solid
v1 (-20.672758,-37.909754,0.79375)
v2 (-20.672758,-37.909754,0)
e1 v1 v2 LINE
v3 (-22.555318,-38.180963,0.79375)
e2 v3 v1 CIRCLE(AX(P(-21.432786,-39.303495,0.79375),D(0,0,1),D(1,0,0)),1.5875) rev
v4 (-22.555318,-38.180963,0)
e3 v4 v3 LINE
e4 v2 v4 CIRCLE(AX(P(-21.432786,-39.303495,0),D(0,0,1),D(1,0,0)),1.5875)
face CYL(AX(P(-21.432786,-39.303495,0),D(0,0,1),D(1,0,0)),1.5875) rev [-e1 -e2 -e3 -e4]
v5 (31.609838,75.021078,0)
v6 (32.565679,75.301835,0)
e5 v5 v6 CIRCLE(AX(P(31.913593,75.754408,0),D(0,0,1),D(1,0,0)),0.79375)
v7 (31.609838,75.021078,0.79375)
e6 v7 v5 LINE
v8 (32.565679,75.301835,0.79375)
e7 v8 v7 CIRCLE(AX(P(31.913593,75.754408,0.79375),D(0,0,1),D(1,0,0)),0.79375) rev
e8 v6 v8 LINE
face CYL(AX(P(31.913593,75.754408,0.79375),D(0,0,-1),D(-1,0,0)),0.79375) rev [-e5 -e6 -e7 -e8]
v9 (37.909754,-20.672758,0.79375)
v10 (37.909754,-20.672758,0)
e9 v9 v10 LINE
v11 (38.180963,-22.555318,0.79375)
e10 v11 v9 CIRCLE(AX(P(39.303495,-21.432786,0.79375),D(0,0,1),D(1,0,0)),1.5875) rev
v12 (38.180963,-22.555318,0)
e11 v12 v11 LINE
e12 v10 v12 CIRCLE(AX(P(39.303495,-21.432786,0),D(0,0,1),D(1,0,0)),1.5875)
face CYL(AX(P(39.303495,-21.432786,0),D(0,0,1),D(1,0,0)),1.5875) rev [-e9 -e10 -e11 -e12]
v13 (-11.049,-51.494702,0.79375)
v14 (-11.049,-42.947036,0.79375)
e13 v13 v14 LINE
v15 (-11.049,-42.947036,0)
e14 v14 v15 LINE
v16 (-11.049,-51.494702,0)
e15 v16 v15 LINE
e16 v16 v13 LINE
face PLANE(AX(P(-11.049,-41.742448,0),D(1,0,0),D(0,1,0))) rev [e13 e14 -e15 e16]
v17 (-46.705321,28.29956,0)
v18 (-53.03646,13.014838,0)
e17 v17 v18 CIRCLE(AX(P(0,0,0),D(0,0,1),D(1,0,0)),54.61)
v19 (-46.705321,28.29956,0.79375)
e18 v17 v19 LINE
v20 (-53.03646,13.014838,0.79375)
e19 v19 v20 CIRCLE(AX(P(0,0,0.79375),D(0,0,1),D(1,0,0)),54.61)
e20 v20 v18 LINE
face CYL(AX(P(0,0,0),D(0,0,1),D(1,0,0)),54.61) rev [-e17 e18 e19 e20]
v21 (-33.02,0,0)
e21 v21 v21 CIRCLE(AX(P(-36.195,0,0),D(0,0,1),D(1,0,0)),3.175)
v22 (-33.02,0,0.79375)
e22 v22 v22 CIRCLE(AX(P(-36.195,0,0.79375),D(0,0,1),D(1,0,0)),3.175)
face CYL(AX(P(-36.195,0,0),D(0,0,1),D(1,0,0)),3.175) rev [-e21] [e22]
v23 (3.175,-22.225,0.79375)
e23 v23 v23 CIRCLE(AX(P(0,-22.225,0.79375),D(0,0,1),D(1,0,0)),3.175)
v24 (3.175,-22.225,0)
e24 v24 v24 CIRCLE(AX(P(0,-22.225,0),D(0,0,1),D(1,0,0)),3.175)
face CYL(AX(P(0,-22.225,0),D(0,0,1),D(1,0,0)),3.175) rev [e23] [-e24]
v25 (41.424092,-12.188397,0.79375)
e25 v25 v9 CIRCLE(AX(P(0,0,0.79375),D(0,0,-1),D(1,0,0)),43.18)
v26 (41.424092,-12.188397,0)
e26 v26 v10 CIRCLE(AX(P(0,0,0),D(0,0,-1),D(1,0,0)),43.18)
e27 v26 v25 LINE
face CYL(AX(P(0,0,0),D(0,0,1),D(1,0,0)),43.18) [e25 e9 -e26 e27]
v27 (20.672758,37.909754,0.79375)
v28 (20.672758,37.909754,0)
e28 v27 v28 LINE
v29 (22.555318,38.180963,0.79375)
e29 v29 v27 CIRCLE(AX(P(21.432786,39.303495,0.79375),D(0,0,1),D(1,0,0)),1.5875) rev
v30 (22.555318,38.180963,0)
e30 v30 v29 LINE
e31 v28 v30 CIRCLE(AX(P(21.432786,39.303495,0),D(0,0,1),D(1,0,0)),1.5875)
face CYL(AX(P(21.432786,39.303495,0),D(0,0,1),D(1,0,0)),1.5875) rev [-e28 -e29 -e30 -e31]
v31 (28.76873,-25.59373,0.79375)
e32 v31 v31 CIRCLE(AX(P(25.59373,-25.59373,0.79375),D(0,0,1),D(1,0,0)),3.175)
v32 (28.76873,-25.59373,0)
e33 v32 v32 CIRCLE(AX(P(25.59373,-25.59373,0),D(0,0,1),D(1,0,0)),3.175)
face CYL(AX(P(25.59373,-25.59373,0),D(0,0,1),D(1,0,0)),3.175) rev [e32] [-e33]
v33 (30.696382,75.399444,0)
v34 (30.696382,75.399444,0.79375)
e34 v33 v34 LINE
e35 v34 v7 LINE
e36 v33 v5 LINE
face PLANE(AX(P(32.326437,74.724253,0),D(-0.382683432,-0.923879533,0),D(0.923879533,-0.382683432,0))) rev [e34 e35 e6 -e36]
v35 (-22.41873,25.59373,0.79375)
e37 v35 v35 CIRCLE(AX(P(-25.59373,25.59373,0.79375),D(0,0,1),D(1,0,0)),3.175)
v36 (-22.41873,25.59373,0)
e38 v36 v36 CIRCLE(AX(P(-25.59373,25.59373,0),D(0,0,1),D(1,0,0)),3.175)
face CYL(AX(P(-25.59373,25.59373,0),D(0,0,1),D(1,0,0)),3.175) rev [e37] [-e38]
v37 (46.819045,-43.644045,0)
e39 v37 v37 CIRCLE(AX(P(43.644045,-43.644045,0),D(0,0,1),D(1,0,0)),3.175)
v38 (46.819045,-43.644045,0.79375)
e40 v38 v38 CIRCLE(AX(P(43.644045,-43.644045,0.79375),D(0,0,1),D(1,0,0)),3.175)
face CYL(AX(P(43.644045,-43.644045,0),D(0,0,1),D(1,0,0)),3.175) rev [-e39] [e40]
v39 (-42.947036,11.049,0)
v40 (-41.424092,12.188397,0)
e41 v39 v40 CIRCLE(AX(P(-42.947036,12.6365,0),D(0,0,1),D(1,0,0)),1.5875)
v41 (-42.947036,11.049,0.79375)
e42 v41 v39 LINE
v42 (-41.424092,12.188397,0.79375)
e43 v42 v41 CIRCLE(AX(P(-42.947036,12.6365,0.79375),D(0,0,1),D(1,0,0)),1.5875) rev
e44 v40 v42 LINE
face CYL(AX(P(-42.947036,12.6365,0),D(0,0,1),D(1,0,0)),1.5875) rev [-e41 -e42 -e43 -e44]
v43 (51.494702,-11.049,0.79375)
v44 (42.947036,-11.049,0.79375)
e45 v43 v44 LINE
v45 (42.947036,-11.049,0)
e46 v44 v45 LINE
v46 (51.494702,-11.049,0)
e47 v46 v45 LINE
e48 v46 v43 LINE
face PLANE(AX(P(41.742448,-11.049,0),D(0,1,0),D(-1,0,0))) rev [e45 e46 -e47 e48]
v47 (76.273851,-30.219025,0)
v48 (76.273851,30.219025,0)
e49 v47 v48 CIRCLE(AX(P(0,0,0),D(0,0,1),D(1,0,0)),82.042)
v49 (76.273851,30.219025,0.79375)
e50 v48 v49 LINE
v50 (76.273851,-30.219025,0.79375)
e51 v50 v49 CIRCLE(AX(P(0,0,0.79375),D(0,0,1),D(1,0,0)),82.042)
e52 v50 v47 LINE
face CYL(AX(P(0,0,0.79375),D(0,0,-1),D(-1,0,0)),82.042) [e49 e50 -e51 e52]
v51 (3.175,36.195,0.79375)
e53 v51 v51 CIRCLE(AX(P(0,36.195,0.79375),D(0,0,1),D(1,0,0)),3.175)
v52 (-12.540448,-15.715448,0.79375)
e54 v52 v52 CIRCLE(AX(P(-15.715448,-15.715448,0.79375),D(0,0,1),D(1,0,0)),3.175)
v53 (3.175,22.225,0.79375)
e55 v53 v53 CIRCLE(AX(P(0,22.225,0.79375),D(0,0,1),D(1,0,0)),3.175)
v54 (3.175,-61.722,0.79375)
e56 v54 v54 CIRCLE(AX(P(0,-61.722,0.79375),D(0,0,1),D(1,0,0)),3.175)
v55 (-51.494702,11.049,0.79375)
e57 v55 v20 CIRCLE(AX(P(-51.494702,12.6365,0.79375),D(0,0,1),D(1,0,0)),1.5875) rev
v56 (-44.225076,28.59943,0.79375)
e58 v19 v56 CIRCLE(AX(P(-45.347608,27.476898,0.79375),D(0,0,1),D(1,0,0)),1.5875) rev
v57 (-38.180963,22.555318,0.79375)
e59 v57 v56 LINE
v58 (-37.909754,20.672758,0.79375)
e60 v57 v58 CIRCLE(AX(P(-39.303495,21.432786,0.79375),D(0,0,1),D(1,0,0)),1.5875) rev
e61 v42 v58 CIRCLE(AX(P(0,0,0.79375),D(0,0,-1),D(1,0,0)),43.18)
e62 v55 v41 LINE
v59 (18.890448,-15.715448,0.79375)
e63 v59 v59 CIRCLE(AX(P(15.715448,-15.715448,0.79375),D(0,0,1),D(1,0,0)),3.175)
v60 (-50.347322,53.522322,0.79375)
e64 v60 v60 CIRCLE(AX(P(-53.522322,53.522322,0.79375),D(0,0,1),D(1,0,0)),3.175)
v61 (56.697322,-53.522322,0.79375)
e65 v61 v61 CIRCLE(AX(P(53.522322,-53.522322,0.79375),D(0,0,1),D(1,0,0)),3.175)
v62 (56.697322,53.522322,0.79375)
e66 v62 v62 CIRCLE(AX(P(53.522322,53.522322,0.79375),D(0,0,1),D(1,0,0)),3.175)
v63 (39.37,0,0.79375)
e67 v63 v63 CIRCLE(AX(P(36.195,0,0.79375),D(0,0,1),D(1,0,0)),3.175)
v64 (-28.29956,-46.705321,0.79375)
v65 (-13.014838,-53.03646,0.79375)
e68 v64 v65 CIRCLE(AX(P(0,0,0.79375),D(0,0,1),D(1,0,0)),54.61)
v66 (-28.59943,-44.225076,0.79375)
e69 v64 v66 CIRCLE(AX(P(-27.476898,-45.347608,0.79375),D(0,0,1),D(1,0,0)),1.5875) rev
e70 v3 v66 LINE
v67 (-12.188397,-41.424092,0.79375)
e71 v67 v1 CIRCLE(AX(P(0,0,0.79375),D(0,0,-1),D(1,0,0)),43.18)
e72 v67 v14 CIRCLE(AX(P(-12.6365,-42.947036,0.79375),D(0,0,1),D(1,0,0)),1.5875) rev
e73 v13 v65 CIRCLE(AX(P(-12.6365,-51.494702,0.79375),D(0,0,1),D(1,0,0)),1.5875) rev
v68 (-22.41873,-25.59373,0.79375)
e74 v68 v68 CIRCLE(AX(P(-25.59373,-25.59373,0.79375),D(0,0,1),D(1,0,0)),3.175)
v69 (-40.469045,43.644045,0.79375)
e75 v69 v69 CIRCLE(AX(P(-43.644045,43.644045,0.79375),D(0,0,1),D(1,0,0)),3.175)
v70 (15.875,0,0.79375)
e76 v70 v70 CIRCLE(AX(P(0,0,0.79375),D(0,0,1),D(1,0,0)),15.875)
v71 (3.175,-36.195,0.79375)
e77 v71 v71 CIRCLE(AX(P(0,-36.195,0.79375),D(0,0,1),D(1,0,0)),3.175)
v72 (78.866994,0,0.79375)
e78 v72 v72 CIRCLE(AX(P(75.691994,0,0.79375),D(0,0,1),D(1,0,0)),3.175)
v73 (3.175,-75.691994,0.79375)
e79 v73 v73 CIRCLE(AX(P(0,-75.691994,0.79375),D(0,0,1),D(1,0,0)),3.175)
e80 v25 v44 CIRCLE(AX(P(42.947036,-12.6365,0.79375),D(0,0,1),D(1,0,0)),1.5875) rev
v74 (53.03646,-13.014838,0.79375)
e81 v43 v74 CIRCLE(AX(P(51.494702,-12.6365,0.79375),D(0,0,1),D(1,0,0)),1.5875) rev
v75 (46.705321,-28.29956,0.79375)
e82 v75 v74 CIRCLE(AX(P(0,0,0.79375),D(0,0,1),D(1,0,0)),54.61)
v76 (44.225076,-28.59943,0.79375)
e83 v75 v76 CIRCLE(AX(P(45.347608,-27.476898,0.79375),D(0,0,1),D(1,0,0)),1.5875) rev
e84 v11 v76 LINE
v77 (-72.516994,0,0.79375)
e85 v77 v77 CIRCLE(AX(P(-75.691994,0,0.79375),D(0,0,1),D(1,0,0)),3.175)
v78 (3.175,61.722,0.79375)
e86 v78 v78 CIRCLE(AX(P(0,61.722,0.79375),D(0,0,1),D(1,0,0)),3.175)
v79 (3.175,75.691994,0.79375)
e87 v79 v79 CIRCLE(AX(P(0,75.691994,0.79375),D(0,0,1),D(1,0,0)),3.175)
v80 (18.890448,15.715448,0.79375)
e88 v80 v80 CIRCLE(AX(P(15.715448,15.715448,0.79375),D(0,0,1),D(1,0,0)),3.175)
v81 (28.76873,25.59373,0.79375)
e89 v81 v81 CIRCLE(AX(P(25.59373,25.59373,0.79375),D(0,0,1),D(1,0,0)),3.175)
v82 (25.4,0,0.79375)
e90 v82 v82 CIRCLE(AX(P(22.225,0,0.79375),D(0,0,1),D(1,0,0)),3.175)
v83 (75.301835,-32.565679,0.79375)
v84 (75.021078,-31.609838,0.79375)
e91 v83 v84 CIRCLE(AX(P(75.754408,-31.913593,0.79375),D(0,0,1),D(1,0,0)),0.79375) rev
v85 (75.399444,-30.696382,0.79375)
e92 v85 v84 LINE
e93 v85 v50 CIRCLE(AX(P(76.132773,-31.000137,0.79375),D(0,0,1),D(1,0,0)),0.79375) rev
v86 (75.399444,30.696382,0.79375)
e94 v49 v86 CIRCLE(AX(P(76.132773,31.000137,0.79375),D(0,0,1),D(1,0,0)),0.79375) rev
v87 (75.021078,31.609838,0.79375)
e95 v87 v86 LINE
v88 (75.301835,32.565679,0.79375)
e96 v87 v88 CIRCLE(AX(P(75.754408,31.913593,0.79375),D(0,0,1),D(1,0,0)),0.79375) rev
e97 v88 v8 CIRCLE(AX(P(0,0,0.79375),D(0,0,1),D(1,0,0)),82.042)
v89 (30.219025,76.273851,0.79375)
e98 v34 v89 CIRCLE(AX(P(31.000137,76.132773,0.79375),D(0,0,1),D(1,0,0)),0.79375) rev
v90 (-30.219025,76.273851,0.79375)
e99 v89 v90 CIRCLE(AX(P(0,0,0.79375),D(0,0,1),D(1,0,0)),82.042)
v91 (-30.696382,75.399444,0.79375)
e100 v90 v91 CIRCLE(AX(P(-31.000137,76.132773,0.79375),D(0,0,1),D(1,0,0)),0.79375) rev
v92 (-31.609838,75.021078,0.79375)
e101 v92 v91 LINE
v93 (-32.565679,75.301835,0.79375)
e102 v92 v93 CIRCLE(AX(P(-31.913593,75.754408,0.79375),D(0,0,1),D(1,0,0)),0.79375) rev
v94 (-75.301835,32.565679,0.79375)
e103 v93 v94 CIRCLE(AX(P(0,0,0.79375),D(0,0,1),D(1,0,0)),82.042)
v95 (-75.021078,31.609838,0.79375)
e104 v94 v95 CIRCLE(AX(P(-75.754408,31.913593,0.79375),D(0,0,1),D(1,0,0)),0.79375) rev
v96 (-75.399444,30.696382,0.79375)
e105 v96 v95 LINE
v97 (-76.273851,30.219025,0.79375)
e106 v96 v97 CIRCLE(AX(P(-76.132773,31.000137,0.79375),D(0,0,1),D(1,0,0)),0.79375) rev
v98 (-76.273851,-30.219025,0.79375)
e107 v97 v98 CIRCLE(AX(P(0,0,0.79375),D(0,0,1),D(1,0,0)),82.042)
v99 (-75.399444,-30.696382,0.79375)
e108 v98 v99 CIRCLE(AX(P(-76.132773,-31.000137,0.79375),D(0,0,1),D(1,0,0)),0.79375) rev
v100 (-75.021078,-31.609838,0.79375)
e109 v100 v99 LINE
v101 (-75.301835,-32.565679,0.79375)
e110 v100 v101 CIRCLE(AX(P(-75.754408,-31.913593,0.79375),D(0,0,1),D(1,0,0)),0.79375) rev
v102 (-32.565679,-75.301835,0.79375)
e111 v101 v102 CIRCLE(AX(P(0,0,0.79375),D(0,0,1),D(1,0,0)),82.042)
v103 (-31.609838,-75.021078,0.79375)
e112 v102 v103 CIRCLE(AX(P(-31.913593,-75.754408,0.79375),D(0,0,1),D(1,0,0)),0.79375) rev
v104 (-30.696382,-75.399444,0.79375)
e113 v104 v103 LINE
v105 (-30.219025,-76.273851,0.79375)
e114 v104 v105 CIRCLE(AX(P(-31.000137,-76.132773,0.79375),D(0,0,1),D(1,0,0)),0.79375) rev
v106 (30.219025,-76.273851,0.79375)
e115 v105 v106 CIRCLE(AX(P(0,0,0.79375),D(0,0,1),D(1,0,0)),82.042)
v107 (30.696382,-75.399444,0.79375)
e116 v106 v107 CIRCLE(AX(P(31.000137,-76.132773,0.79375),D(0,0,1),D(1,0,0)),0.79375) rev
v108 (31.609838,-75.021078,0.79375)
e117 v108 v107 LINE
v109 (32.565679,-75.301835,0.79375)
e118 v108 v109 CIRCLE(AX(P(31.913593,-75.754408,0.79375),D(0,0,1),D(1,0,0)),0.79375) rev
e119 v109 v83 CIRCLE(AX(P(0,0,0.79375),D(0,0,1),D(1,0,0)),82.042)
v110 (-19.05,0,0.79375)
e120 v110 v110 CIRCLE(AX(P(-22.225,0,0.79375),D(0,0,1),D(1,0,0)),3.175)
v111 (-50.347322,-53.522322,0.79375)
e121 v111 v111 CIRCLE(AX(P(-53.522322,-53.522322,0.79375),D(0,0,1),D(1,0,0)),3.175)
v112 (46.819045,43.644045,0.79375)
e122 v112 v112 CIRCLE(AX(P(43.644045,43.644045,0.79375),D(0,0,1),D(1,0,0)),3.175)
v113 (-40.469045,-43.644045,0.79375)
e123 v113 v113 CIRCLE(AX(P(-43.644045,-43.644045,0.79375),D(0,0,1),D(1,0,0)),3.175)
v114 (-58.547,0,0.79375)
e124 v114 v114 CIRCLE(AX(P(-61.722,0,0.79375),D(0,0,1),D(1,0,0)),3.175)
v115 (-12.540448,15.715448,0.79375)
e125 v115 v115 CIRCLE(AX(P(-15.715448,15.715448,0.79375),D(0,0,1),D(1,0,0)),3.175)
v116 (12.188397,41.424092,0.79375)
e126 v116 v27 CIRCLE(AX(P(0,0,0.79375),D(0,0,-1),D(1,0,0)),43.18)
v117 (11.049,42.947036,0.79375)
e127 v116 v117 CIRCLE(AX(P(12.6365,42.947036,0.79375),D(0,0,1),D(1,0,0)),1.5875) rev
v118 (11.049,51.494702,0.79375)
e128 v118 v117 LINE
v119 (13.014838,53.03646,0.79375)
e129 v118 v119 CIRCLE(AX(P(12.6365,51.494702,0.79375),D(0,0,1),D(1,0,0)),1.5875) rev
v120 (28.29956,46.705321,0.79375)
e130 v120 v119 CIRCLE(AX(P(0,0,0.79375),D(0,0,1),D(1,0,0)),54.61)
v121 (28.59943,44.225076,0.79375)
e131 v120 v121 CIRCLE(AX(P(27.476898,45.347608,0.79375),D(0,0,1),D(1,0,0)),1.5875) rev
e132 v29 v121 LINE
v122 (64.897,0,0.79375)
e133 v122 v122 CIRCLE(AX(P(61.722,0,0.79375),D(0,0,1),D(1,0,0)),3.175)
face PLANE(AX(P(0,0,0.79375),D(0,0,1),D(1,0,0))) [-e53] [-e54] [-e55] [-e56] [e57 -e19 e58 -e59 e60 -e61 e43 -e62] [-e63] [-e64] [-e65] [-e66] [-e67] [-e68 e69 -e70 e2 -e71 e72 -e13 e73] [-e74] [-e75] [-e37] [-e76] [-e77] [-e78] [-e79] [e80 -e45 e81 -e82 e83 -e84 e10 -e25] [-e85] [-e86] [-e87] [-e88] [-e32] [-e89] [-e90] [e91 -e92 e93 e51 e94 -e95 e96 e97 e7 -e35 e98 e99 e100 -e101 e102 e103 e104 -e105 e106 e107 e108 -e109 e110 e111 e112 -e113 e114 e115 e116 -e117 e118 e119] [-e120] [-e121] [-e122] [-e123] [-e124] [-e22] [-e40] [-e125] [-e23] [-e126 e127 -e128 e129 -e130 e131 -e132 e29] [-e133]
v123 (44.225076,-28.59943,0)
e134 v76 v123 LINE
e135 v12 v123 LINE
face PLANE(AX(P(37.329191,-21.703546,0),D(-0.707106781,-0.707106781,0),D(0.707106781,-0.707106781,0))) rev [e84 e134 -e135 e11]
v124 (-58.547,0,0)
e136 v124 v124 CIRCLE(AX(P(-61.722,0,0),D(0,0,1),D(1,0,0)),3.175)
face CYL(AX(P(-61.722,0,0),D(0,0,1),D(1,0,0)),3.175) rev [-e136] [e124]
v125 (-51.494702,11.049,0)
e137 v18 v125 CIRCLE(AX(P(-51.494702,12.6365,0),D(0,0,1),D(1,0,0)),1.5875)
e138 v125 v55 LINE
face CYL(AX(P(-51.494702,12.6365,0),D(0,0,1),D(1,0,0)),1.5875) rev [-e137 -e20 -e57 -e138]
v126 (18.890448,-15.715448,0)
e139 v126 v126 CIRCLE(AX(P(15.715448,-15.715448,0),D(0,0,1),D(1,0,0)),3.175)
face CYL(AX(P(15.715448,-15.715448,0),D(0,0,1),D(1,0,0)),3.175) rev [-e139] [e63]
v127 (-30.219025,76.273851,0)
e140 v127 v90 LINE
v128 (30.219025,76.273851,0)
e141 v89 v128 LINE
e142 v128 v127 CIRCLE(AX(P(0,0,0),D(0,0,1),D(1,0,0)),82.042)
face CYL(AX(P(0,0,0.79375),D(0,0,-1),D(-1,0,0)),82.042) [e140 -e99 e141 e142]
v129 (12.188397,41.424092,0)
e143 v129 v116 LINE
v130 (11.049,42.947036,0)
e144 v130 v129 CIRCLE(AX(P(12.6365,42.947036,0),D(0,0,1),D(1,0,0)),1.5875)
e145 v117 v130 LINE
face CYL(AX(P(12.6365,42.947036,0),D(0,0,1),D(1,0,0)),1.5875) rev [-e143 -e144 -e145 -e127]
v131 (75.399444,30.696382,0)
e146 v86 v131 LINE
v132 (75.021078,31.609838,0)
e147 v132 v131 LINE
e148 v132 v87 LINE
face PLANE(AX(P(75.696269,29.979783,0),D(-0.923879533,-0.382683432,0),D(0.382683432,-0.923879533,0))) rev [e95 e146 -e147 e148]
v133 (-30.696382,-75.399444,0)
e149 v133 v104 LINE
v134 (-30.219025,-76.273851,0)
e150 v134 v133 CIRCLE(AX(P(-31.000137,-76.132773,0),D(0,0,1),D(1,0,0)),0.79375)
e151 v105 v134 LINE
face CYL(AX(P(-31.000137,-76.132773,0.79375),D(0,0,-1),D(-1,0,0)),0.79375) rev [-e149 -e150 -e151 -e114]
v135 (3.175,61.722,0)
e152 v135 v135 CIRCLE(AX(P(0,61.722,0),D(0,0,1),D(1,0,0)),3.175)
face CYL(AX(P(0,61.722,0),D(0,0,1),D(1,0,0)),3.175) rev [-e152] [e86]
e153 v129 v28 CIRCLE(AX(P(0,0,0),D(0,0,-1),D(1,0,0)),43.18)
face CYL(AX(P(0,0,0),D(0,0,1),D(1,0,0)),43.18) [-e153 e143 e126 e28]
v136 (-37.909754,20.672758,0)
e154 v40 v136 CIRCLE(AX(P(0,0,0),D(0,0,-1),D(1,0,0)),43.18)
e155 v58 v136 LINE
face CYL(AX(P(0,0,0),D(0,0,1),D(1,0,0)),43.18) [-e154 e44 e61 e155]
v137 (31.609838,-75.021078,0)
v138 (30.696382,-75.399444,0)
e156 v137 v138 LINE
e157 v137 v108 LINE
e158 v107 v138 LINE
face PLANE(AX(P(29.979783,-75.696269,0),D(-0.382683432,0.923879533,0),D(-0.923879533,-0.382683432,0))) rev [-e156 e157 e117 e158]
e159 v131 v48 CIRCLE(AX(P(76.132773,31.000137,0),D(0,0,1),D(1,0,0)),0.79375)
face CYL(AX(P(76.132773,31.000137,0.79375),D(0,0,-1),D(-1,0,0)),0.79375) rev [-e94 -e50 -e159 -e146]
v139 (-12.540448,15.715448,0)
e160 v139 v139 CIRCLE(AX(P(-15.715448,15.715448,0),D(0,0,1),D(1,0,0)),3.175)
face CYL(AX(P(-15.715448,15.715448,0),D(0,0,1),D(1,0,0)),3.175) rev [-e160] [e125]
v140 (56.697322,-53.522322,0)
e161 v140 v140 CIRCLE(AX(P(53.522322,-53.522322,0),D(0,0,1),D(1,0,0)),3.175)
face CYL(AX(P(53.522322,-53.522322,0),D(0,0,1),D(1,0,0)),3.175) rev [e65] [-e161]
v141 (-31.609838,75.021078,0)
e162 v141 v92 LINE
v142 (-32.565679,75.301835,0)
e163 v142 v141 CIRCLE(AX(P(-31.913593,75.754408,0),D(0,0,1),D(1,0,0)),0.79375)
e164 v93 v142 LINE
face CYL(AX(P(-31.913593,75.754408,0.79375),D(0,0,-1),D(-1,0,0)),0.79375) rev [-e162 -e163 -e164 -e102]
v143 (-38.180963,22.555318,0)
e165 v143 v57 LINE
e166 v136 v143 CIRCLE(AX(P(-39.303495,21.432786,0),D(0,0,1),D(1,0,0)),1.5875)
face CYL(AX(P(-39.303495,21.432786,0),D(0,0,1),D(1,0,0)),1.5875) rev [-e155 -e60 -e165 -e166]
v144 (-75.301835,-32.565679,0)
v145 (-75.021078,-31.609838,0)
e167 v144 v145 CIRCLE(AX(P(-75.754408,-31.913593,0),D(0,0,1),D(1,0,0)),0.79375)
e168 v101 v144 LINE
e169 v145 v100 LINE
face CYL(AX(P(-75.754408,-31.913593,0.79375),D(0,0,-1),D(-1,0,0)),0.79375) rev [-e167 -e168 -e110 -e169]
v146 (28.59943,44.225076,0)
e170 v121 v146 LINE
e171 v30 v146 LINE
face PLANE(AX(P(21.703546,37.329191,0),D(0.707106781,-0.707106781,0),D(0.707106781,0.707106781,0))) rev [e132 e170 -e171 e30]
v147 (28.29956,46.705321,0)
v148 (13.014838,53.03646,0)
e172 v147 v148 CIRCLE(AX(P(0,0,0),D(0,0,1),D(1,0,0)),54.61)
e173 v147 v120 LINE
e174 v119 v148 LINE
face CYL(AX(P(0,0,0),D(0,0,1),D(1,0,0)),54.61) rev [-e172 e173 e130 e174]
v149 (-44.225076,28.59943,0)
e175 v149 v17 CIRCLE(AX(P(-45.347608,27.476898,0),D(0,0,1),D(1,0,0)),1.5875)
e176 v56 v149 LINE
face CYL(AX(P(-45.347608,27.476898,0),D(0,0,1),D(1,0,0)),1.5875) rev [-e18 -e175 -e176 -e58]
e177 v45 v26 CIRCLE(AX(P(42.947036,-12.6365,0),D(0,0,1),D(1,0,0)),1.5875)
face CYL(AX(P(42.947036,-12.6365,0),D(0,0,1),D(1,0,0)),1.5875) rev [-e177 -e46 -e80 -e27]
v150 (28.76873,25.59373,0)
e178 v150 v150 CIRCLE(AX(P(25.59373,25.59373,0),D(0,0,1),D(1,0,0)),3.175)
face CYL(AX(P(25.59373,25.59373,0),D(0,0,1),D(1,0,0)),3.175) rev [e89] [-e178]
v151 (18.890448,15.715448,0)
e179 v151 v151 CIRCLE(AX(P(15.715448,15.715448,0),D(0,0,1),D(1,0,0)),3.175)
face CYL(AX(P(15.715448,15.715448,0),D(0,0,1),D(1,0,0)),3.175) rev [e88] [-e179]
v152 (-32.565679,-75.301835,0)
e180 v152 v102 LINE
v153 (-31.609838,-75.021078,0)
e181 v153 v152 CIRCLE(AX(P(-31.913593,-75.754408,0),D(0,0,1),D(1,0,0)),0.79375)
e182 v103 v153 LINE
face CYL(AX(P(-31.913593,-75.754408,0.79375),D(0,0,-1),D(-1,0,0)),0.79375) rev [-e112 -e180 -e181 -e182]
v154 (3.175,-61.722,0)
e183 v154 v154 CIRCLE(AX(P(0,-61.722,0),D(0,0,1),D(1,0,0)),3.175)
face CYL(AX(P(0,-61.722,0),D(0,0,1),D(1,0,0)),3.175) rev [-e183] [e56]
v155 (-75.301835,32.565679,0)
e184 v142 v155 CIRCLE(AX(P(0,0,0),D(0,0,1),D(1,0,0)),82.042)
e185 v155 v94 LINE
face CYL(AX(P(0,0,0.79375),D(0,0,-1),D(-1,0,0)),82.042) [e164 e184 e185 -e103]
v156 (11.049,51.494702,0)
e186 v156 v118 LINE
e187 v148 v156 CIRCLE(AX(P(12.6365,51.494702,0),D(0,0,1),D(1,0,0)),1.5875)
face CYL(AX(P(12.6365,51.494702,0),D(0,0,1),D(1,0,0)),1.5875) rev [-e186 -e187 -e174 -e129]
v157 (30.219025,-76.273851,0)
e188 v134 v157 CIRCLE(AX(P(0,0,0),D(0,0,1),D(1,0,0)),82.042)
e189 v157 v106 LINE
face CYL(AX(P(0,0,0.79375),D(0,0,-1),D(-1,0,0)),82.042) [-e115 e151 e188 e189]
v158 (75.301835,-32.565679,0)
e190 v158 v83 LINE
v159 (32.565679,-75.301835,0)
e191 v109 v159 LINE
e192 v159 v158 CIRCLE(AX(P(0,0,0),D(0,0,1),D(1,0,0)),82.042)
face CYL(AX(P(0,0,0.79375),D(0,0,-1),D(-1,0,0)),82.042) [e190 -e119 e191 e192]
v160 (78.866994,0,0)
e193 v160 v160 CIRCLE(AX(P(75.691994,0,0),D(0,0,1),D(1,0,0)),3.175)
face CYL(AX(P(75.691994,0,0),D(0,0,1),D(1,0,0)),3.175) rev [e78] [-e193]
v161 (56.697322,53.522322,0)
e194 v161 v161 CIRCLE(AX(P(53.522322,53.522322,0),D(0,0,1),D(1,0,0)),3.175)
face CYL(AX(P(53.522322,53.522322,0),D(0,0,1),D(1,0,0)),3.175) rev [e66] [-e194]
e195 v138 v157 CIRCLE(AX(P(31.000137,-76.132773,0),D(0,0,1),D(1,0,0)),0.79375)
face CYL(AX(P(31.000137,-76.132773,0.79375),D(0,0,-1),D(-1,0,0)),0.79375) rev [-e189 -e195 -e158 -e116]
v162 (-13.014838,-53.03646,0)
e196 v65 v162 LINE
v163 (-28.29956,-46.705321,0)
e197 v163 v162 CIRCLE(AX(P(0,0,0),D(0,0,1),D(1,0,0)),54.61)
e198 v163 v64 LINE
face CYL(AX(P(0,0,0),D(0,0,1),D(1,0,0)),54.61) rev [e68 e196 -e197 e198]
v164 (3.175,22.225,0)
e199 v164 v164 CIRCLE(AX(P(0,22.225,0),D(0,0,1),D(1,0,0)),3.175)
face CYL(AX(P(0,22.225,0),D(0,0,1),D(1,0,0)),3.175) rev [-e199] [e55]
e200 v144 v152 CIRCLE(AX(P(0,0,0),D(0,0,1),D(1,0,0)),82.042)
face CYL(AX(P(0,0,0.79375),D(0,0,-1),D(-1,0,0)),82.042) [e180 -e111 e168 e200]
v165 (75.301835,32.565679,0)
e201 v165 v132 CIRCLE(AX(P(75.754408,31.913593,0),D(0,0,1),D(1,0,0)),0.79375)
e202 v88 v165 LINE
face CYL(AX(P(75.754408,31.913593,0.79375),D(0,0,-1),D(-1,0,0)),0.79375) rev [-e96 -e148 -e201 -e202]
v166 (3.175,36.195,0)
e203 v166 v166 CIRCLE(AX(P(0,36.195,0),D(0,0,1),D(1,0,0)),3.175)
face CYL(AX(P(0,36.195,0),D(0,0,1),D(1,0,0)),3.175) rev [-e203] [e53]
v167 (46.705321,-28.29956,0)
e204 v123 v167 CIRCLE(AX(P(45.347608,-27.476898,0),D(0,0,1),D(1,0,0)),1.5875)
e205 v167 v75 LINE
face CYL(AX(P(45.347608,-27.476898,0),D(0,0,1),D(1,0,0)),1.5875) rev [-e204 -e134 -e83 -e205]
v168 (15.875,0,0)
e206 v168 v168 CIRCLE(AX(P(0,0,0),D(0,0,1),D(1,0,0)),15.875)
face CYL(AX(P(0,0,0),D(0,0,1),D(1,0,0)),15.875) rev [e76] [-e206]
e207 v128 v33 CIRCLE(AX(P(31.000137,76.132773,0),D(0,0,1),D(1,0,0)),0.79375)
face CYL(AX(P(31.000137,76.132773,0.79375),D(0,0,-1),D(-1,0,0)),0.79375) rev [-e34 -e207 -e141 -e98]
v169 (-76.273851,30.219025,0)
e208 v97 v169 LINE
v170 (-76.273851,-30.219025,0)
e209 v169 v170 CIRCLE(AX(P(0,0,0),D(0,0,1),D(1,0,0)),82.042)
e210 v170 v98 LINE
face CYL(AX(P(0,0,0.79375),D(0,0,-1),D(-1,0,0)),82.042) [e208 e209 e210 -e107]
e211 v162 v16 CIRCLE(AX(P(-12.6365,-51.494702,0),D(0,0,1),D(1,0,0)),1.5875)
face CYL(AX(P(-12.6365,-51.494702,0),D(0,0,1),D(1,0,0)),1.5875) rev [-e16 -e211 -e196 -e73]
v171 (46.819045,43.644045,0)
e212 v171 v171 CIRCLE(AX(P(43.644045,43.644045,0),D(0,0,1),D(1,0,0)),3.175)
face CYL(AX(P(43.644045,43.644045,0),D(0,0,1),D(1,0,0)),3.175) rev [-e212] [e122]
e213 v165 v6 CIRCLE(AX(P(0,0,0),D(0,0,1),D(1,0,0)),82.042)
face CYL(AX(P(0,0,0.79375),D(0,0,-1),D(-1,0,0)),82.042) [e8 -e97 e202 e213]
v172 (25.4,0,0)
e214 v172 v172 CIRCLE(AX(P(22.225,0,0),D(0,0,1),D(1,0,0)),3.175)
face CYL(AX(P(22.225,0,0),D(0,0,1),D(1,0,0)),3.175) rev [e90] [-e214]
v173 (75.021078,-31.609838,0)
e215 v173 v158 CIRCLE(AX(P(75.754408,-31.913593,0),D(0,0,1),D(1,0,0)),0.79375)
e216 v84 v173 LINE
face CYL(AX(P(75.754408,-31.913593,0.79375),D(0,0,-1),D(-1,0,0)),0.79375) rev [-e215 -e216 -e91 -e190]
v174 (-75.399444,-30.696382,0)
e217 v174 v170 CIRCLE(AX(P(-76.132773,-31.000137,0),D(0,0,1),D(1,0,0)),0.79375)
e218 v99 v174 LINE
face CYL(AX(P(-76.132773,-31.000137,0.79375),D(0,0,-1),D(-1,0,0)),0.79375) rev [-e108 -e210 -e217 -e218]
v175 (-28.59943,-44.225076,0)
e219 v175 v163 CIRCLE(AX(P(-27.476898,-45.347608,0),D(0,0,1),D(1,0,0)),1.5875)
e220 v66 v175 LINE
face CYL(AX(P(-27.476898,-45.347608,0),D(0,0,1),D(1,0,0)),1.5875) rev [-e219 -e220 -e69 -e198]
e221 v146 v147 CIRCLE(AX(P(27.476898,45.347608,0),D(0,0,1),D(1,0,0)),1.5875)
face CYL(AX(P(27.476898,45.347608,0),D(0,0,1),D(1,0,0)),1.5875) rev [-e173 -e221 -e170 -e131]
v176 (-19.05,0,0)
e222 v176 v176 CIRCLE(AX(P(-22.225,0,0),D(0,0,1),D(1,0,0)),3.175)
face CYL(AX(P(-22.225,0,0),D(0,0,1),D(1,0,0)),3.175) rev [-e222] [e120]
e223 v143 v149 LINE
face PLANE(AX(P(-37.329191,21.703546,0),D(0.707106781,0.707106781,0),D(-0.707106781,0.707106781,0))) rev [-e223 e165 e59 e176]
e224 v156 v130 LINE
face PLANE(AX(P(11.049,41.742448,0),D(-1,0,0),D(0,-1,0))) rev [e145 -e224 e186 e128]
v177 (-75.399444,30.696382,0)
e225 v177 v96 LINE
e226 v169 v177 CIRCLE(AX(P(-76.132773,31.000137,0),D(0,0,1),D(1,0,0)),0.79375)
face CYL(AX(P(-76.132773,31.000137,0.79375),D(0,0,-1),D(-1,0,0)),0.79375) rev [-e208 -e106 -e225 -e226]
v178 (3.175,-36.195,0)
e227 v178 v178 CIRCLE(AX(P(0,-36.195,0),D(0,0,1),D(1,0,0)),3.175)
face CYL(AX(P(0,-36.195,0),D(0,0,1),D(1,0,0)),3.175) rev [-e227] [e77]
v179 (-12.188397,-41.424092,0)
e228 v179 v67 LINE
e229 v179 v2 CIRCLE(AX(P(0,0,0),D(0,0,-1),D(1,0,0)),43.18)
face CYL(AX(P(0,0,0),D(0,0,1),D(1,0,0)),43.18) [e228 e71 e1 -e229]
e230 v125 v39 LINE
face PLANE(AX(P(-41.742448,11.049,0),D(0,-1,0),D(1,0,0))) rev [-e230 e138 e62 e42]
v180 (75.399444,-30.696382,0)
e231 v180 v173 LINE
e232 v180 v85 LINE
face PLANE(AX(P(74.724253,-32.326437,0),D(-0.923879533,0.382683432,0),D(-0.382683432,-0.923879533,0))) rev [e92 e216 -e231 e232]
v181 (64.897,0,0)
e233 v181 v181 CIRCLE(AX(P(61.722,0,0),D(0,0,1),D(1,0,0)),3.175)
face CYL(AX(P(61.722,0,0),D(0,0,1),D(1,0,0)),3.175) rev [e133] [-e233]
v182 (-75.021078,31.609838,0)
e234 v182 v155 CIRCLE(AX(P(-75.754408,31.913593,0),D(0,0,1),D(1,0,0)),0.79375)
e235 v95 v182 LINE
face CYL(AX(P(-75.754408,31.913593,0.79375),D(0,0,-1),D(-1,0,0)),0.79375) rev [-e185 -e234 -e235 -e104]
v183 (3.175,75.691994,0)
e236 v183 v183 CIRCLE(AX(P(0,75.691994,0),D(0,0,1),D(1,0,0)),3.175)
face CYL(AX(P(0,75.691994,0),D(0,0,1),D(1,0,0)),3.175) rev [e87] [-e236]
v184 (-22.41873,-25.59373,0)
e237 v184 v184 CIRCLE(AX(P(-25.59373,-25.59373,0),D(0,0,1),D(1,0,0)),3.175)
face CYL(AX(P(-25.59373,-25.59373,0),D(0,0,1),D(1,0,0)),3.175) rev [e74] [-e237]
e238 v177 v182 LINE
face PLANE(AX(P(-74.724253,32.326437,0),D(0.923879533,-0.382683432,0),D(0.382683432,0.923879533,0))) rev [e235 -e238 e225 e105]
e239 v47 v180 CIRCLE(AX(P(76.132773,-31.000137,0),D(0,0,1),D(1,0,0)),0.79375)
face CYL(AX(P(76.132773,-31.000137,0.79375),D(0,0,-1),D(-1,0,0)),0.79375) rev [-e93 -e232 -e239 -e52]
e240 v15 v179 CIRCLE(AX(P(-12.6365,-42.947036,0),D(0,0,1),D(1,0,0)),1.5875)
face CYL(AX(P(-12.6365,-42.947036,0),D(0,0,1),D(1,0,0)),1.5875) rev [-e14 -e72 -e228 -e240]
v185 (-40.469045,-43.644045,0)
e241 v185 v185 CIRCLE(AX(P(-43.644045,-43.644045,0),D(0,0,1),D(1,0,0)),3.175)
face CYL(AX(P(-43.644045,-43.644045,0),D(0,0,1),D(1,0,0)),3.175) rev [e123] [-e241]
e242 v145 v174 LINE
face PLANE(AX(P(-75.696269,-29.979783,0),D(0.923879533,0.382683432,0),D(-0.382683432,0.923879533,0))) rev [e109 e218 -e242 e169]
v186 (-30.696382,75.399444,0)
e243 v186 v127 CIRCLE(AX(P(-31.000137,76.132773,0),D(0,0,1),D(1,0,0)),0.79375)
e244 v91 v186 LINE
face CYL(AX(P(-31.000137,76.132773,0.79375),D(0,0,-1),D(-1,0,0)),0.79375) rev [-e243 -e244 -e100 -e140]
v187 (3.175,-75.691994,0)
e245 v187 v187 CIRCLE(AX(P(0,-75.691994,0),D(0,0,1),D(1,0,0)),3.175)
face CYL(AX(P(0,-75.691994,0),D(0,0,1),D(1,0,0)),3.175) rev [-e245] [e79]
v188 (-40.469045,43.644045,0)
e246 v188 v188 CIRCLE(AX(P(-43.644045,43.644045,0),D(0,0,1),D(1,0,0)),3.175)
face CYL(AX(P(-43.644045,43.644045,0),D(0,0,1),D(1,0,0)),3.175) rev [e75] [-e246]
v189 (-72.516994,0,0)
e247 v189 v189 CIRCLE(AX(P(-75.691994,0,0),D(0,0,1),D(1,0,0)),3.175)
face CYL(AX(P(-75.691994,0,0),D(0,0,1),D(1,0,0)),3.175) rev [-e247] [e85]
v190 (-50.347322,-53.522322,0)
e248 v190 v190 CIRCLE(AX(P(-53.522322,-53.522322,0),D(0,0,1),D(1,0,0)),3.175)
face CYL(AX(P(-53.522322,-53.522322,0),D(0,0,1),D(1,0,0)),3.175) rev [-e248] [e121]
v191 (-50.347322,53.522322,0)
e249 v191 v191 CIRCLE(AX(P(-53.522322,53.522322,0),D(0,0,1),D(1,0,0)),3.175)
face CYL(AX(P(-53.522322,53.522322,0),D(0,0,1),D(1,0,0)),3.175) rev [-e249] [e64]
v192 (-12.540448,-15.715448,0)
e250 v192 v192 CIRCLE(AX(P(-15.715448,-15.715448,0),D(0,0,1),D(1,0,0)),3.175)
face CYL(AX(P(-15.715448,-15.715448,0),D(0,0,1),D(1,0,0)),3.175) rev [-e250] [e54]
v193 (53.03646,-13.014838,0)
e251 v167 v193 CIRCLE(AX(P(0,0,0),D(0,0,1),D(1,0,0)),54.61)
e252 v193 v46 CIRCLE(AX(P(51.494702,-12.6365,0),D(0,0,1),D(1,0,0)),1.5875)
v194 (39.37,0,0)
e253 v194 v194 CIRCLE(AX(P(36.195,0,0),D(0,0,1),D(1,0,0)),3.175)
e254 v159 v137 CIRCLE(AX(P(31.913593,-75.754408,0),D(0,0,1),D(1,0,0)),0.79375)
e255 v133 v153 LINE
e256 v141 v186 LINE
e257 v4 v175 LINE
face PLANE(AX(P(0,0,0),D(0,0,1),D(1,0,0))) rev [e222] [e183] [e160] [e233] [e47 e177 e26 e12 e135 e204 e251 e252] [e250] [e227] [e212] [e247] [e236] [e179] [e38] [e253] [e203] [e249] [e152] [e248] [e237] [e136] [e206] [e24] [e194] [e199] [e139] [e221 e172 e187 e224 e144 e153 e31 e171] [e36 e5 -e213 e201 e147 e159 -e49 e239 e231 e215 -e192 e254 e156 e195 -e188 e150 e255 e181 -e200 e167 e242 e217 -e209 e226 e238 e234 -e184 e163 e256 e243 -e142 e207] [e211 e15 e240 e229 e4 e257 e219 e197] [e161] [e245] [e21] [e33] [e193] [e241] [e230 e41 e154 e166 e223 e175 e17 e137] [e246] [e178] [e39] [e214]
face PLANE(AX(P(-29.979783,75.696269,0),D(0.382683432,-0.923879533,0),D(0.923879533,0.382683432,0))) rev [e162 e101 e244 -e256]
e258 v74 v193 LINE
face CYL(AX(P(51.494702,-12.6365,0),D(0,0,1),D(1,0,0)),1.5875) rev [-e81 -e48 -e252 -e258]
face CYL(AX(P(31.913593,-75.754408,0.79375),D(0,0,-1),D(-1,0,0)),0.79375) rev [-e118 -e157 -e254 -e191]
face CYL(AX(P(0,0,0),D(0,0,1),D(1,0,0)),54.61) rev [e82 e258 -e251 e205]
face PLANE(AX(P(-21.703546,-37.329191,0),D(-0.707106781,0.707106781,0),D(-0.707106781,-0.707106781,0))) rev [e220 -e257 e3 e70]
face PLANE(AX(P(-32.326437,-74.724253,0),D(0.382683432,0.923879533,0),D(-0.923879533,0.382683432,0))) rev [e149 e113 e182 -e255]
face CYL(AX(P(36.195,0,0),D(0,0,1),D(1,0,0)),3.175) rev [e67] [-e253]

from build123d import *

# Parameters (mm, degrees)
SKETCH4_R           = 82.042
BOSS_EXTRUDE2_DEPTH = 0.79375
SKETCH5_R           = 15.875
CUT_EXTRUDE5_DEPTH  = 117.027624155
CUT_EXTRUDE11_DEPTH = 117.027624155
SKETCH9_R           = 3.175
CUT_EXTRUDE12_DEPTH = 117.027624155
FILLET1_R           = 1.5875
FILLET2_R           = 0.79375


with BuildPart() as part:
    # Sketch4 → Boss-Extrude2 (new body)
    with BuildSketch(Plane.XY):
        Circle(SKETCH4_R)
    extrude(amount=BOSS_EXTRUDE2_DEPTH)

    # Sketch5 → Cut-Extrude5 (cut, through all)
    with BuildSketch(Plane.XY.offset(0.79375)):
        Circle(SKETCH5_R)
    extrude(amount=-CUT_EXTRUDE5_DEPTH, mode=Mode.SUBTRACT)

    # Sketch8 → Cut-Extrude11 (cut, through all)
    with BuildSketch(Plane.XY.offset(0.79375)):
        Polygon((76.869596069, 30.465791131), (75.89758015, 32.812445144), (74.724253144, 32.326437185), (75.696269062, 29.979783172), align=None)
        Polygon((-30.465791131, 76.869596069), (-32.812445144, 75.89758015), (-32.326437185, 74.724253144), (-29.979783172, 75.696269062), align=None)
        Polygon((-75.89758015, 32.812445144), (-76.869596069, 30.465791131), (-75.696269062, 29.979783172), (-74.724253144, 32.326437185), align=None)
        Polygon((-76.869596069, -30.465791131), (-75.89758015, -32.812445144), (-74.724253144, -32.326437185), (-75.696269062, -29.979783172), align=None)
        Polygon((-32.812445144, -75.89758015), (-30.465791131, -76.869596069), (-29.979783172, -75.696269062), (-32.326437185, -74.724253144), align=None)
        Polygon((30.465791131, -76.869596069), (32.812445144, -75.89758015), (32.326437185, -74.724253144), (29.979783172, -75.696269062), align=None)
        Polygon((75.89758015, -32.812445144), (76.869596069, -30.465791131), (75.696269062, -29.979783172), (74.724253144, -32.326437185), align=None)
        Polygon((32.812445144, 75.89758015), (30.465791131, 76.869596069), (29.979783172, 75.696269062), (32.326437185, 74.724253144), align=None)
    extrude(amount=-CUT_EXTRUDE11_DEPTH, mode=Mode.SUBTRACT)

    # Sketch9 → Cut-Extrude12 (cut, through all)
    with BuildSketch(Plane.XY.offset(0.79375)):
        with Locations((22.225, 0)):
            Circle(SKETCH9_R)
        with Locations((36.195, 0)):
            Circle(SKETCH9_R)
        with Locations((61.722, 0)):
            Circle(SKETCH9_R)
        with Locations((75.691993951, 0)):
            Circle(SKETCH9_R)
        with Locations((15.715448212, -15.715448212)):
            Circle(SKETCH9_R)
        with Locations((25.593729945, -25.593729945)):
            Circle(SKETCH9_R)
        with Locations((43.644044748, -43.644044748)):
            Circle(SKETCH9_R)
        with Locations((53.522322204, -53.522322204)):
            Circle(SKETCH9_R)
        with Locations((0, -22.225)):
            Circle(SKETCH9_R)
        with Locations((0, -36.195)):
            Circle(SKETCH9_R)
        with Locations((0, -61.722)):
            Circle(SKETCH9_R)
        with Locations((0, -75.691993951)):
            Circle(SKETCH9_R)
        with Locations((-15.715448212, -15.715448212)):
            Circle(SKETCH9_R)
        with Locations((-25.593729945, -25.593729945)):
            Circle(SKETCH9_R)
        with Locations((-43.644044748, -43.644044748)):
            Circle(SKETCH9_R)
        with Locations((-53.522322204, -53.522322204)):
            Circle(SKETCH9_R)
        with Locations((-22.225, 0)):
            Circle(SKETCH9_R)
        with Locations((-36.195, 0)):
            Circle(SKETCH9_R)
        with Locations((-61.722, 0)):
            Circle(SKETCH9_R)
        with Locations((-75.691993951, 0)):
            Circle(SKETCH9_R)
        with Locations((-15.715448212, 15.715448212)):
            Circle(SKETCH9_R)
        with Locations((-25.593729945, 25.593729945)):
            Circle(SKETCH9_R)
        with Locations((-43.644044748, 43.644044748)):
            Circle(SKETCH9_R)
        with Locations((-53.522322204, 53.522322204)):
            Circle(SKETCH9_R)
        with Locations((0, 22.225)):
            Circle(SKETCH9_R)
        with Locations((0, 36.195)):
            Circle(SKETCH9_R)
        with Locations((0, 61.722)):
            Circle(SKETCH9_R)
        with Locations((0, 75.691993951)):
            Circle(SKETCH9_R)
        with Locations((15.715448212, 15.715448212)):
            Circle(SKETCH9_R)
        with Locations((25.593729945, 25.593729945)):
            Circle(SKETCH9_R)
        with Locations((43.644044748, 43.644044748)):
            Circle(SKETCH9_R)
        with Locations((53.522322204, 53.522322204)):
            Circle(SKETCH9_R)
        with BuildLine():
            Line((21.703545506, 37.329191157), (30.003653075, 45.629298725))
            ThreePointArc((30.003653075, 45.629298725), (20.898342241, 50.45306127), (11.049, 53.480573099))
            Line((11.049, 53.480573099), (11.049, 41.742448407))
            ThreePointArc((11.049, 41.742448407), (16.52427061, 39.893118214), (21.703545506, 37.329191157))
        make_face()
        with BuildLine():
            Line((41.742448407, -11.049), (53.480573099, -11.049))
            ThreePointArc((53.480573099, -11.049), (50.45306127, -20.898342241), (45.629298725, -30.003653075))
            Line((45.629298725, -30.003653075), (37.329191157, -21.703545506))
            ThreePointArc((37.329191157, -21.703545506), (39.893118214, -16.52427061), (41.742448407, -11.049))
        make_face()
        with BuildLine():
            Line((-11.049, -41.742448407), (-11.049, -53.480573099))
            ThreePointArc((-11.049, -53.480573099), (-20.898342241, -50.45306127), (-30.003653075, -45.629298725))
            Line((-30.003653075, -45.629298725), (-21.703545506, -37.329191157))
            ThreePointArc((-21.703545506, -37.329191157), (-16.52427061, -39.893118214), (-11.049, -41.742448407))
        make_face()
        with BuildLine():
            Line((-41.742448407, 11.049), (-53.480573099, 11.049))
            ThreePointArc((-53.480573099, 11.049), (-50.45306127, 20.898342241), (-45.629298725, 30.003653075))
            Line((-45.629298725, 30.003653075), (-37.329191157, 21.703545506))
            ThreePointArc((-37.329191157, 21.703545506), (-39.893118214, 16.52427061), (-41.742448407, 11.049))
        make_face()
    extrude(amount=-CUT_EXTRUDE12_DEPTH, mode=Mode.SUBTRACT)

    # Fillet1
    fillet1_edges = [part.edges().sort_by_distance(p)[0] for p in [
        (21.703545506, 37.329191157, 0.396875),
        (11.049, 41.742448407, 0.396875),
        (11.049, 53.480573099, 0.396875),
        (30.003653075, 45.629298725, 0.396875),
        (37.329191157, -21.703545506, 0.396875),
        (41.742448407, -11.049, 0.396875),
        (53.480573099, -11.049, 0.396875),
        (45.629298725, -30.003653075, 0.396875),
        (-21.703545506, -37.329191157, 0.396875),
        (-11.049, -41.742448407, 0.396875),
        (-11.049, -53.480573099, 0.396875),
        (-30.003653075, -45.629298725, 0.396875),
        (-37.329191157, 21.703545506, 0.396875),
        (-41.742448407, 11.049, 0.396875),
        (-53.480573099, 11.049, 0.396875),
        (-45.629298725, 30.003653075, 0.396875),
    ]]
    fillet(fillet1_edges, radius=FILLET1_R)

    # Fillet2
    # the kernel refuses this fillet: 0.79375 mm, written as the material it adds along each edge
    with BuildSketch(Plane(origin=(-75.696269062, 29.979783172, 0.79375), x_dir=(0.3826834323651269, 0.9238795325112714, 0), z_dir=(0, 0, -1)), Plane(origin=(-32.326437185, 74.724253144, 0.79375), x_dir=(0.9238795325112888, 0.382683432365085, 0), z_dir=(0, 0, -1))) as fillet2_piece_1:
        with BuildLine():
            CenterArc((0.775641503, -0.79375), FILLET2_R, 90, 77.737864874)
            Line((0, -0.62516969), (-0.01551283, -0.621798083))
            ThreePointArc((-0.01551283, -0.621798083), (-0.015875, -0.312584845), (-0.015875, 0))
            Line((-0.015875, 0), (0, 0.015875))
            Line((0, 0.015875), (0.775641503, 0.015875))
            Line((0.775641503, 0.015875), (0.775641503, 0))
        make_face()
    extrude(amount=0.79375)
    with BuildSketch(Plane(origin=(-29.979783172, 75.696269062, 0.79375), x_dir=(-0.3826834323684612, 0.9238795325098903, 0), z_dir=(0, 0, -1)), Plane(origin=(-74.724253144, 32.326437185, 0.79375), x_dir=(-0.9238795325127166, 0.38268343236163754, 0), z_dir=(0, 0, -1))) as fillet2_piece_2:
        with BuildLine():
            CenterArc((0.79375, -0.775641503), FILLET2_R, 102.262135126, 77.737864874)
            Line((0, -0.775641503), (-0.015875, -0.775641503))
            Line((-0.015875, -0.775641503), (-0.015875, 0))
            Line((-0.015875, 0), (0, 0.015875))
            ThreePointArc((0, 0.015875), (0.312584845, 0.015875), (0.621798083, 0.01551283))
            Line((0.621798083, 0.01551283), (0.62516969, 0))
        make_face()
    extrude(amount=0.79375)
    with BuildSketch(Plane(origin=(-74.724253144, -32.326437185, 0.79375), x_dir=(-0.9238795325128379, -0.3826834323613448, 0), z_dir=(0, 0, -1)), Plane(origin=(-29.979783172, -75.696269062, 0.79375), x_dir=(-0.3826834323686382, -0.9238795325098169, 0), z_dir=(0, 0, -1)), Plane(origin=(32.326437185, -74.724253144, 0.79375), x_dir=(0.3826834323615479, -0.9238795325127538, 0), z_dir=(0, 0, -1))) as fillet2_piece_3:
        with BuildLine():
            CenterArc((0.79375, 0.775641503), FILLET2_R, 180, 77.737864874)
            Line((0, 0.775641503), (-0.015875, 0.775641503))
            Line((-0.015875, 0.775641503), (-0.015875, 0))
            Line((-0.015875, 0), (0, -0.015875))
            ThreePointArc((0, -0.015875), (0.312584845, -0.015875), (0.621798083, -0.01551283))
            Line((0.621798083, -0.01551283), (0.62516969, 0))
        make_face()
    extrude(amount=0.79375)
    with BuildSketch(Plane(origin=(-75.696269062, -29.979783172, 0.79375), x_dir=(0.3826834323649975, -0.923879532511325, 0), z_dir=(0, 0, -1)), Plane(origin=(-32.326437185, -74.724253144, 0.79375), x_dir=(0.9238795325112237, -0.38268343236524216, 0), z_dir=(0, 0, -1)), Plane(origin=(29.979783172, -75.696269062, 0.79375), x_dir=(0.9238795325113635, 0.38268343236490476, 0), z_dir=(0, 0, -1))) as fillet2_piece_4:
        with BuildLine():
            CenterArc((0.775641503, 0.79375), FILLET2_R, 192.262135126, 77.737864874)
            Line((0, 0.62516969), (-0.01551283, 0.621798083))
            ThreePointArc((-0.01551283, 0.621798083), (-0.015875, 0.312584845), (-0.015875, 0))
            Line((-0.015875, 0), (0, -0.015875))
            Line((0, -0.015875), (0.775641503, -0.015875))
            Line((0.775641503, -0.015875), (0.775641503, 0))
        make_face()
    extrude(amount=0.79375)
    with BuildSketch(Plane(origin=(75.696269062, -29.979783172, 0.79375), x_dir=(0.9238795325097092, -0.382683432368898, 0), z_dir=(0, 0, -1))) as fillet2_piece_5:
        with BuildLine():
            CenterArc((0.79375, 0.775641503), FILLET2_R, 180, 77.737864875)
            Line((0, 0.775641503), (-0.015875, 0.775641503))
            Line((-0.015875, 0.775641503), (-0.015875, 0))
            Line((-0.015875, 0), (0, -0.015875))
            ThreePointArc((0, -0.015875), (0.312584845, -0.015875), (0.621798084, -0.01551283))
            Line((0.621798084, -0.01551283), (0.62516969, 0))
        make_face()
    extrude(amount=0.79375)
    with BuildSketch(Plane(origin=(74.724253144, -32.326437185, 0.79375), x_dir=(0.38268343236533003, 0.9238795325111873, 0), z_dir=(0, 0, -1))) as fillet2_piece_6:
        with BuildLine():
            CenterArc((0.775641503, 0.79375), FILLET2_R, 192.262135125, 77.737864875)
            Line((0, 0.62516969), (-0.01551283, 0.621798084))
            ThreePointArc((-0.01551283, 0.621798084), (-0.015875, 0.312584845), (-0.015875, 0))
            Line((-0.015875, 0), (0, -0.015875))
            Line((0, -0.015875), (0.775641503, -0.015875))
            Line((0.775641503, -0.015875), (0.775641503, 0))
        make_face()
    extrude(amount=0.79375)
    with BuildSketch(Plane(origin=(75.696269062, 29.979783172, 0.79375), x_dir=(0.9238795325100071, 0.3826834323681794, 0), z_dir=(0, 0, -1)), Plane(origin=(32.326437185, 74.724253144, 0.79375), x_dir=(0.3826834323619378, 0.9238795325125924, 0), z_dir=(0, 0, -1))) as fillet2_piece_7:
        with BuildLine():
            CenterArc((0.79375, -0.775641503), FILLET2_R, 102.262135126, 77.737864875)
            Line((0, -0.775641503), (-0.015875, -0.775641503))
            Line((-0.015875, -0.775641503), (-0.015875, 0))
            Line((-0.015875, 0), (0, 0.015875))
            ThreePointArc((0, 0.015875), (0.312584845, 0.015875), (0.621798084, 0.01551283))
            Line((0.621798084, 0.01551283), (0.62516969, 0))
        make_face()
    extrude(amount=0.79375)
    with BuildSketch(Plane(origin=(74.724253144, 32.326437185, 0.79375), x_dir=(0.3826834323648073, -0.9238795325114039, 0), z_dir=(0, 0, -1)), Plane(origin=(29.979783172, 75.696269062, 0.79375), x_dir=(0.9238795325111434, -0.38268343236543584, 0), z_dir=(0, 0, -1))) as fillet2_piece_8:
        with BuildLine():
            CenterArc((0.775641503, -0.79375), FILLET2_R, 90, 77.737864875)
            Line((0, -0.62516969), (-0.01551283, -0.621798084))
            ThreePointArc((-0.01551283, -0.621798084), (-0.015875, -0.312584845), (-0.015875, 0))
            Line((-0.015875, 0), (0, 0.015875))
            Line((0, 0.015875), (0.775641503, 0.015875))
            Line((0.775641503, 0.015875), (0.775641503, 0))
        make_face()
    extrude(amount=0.79375)


solid = part.part
